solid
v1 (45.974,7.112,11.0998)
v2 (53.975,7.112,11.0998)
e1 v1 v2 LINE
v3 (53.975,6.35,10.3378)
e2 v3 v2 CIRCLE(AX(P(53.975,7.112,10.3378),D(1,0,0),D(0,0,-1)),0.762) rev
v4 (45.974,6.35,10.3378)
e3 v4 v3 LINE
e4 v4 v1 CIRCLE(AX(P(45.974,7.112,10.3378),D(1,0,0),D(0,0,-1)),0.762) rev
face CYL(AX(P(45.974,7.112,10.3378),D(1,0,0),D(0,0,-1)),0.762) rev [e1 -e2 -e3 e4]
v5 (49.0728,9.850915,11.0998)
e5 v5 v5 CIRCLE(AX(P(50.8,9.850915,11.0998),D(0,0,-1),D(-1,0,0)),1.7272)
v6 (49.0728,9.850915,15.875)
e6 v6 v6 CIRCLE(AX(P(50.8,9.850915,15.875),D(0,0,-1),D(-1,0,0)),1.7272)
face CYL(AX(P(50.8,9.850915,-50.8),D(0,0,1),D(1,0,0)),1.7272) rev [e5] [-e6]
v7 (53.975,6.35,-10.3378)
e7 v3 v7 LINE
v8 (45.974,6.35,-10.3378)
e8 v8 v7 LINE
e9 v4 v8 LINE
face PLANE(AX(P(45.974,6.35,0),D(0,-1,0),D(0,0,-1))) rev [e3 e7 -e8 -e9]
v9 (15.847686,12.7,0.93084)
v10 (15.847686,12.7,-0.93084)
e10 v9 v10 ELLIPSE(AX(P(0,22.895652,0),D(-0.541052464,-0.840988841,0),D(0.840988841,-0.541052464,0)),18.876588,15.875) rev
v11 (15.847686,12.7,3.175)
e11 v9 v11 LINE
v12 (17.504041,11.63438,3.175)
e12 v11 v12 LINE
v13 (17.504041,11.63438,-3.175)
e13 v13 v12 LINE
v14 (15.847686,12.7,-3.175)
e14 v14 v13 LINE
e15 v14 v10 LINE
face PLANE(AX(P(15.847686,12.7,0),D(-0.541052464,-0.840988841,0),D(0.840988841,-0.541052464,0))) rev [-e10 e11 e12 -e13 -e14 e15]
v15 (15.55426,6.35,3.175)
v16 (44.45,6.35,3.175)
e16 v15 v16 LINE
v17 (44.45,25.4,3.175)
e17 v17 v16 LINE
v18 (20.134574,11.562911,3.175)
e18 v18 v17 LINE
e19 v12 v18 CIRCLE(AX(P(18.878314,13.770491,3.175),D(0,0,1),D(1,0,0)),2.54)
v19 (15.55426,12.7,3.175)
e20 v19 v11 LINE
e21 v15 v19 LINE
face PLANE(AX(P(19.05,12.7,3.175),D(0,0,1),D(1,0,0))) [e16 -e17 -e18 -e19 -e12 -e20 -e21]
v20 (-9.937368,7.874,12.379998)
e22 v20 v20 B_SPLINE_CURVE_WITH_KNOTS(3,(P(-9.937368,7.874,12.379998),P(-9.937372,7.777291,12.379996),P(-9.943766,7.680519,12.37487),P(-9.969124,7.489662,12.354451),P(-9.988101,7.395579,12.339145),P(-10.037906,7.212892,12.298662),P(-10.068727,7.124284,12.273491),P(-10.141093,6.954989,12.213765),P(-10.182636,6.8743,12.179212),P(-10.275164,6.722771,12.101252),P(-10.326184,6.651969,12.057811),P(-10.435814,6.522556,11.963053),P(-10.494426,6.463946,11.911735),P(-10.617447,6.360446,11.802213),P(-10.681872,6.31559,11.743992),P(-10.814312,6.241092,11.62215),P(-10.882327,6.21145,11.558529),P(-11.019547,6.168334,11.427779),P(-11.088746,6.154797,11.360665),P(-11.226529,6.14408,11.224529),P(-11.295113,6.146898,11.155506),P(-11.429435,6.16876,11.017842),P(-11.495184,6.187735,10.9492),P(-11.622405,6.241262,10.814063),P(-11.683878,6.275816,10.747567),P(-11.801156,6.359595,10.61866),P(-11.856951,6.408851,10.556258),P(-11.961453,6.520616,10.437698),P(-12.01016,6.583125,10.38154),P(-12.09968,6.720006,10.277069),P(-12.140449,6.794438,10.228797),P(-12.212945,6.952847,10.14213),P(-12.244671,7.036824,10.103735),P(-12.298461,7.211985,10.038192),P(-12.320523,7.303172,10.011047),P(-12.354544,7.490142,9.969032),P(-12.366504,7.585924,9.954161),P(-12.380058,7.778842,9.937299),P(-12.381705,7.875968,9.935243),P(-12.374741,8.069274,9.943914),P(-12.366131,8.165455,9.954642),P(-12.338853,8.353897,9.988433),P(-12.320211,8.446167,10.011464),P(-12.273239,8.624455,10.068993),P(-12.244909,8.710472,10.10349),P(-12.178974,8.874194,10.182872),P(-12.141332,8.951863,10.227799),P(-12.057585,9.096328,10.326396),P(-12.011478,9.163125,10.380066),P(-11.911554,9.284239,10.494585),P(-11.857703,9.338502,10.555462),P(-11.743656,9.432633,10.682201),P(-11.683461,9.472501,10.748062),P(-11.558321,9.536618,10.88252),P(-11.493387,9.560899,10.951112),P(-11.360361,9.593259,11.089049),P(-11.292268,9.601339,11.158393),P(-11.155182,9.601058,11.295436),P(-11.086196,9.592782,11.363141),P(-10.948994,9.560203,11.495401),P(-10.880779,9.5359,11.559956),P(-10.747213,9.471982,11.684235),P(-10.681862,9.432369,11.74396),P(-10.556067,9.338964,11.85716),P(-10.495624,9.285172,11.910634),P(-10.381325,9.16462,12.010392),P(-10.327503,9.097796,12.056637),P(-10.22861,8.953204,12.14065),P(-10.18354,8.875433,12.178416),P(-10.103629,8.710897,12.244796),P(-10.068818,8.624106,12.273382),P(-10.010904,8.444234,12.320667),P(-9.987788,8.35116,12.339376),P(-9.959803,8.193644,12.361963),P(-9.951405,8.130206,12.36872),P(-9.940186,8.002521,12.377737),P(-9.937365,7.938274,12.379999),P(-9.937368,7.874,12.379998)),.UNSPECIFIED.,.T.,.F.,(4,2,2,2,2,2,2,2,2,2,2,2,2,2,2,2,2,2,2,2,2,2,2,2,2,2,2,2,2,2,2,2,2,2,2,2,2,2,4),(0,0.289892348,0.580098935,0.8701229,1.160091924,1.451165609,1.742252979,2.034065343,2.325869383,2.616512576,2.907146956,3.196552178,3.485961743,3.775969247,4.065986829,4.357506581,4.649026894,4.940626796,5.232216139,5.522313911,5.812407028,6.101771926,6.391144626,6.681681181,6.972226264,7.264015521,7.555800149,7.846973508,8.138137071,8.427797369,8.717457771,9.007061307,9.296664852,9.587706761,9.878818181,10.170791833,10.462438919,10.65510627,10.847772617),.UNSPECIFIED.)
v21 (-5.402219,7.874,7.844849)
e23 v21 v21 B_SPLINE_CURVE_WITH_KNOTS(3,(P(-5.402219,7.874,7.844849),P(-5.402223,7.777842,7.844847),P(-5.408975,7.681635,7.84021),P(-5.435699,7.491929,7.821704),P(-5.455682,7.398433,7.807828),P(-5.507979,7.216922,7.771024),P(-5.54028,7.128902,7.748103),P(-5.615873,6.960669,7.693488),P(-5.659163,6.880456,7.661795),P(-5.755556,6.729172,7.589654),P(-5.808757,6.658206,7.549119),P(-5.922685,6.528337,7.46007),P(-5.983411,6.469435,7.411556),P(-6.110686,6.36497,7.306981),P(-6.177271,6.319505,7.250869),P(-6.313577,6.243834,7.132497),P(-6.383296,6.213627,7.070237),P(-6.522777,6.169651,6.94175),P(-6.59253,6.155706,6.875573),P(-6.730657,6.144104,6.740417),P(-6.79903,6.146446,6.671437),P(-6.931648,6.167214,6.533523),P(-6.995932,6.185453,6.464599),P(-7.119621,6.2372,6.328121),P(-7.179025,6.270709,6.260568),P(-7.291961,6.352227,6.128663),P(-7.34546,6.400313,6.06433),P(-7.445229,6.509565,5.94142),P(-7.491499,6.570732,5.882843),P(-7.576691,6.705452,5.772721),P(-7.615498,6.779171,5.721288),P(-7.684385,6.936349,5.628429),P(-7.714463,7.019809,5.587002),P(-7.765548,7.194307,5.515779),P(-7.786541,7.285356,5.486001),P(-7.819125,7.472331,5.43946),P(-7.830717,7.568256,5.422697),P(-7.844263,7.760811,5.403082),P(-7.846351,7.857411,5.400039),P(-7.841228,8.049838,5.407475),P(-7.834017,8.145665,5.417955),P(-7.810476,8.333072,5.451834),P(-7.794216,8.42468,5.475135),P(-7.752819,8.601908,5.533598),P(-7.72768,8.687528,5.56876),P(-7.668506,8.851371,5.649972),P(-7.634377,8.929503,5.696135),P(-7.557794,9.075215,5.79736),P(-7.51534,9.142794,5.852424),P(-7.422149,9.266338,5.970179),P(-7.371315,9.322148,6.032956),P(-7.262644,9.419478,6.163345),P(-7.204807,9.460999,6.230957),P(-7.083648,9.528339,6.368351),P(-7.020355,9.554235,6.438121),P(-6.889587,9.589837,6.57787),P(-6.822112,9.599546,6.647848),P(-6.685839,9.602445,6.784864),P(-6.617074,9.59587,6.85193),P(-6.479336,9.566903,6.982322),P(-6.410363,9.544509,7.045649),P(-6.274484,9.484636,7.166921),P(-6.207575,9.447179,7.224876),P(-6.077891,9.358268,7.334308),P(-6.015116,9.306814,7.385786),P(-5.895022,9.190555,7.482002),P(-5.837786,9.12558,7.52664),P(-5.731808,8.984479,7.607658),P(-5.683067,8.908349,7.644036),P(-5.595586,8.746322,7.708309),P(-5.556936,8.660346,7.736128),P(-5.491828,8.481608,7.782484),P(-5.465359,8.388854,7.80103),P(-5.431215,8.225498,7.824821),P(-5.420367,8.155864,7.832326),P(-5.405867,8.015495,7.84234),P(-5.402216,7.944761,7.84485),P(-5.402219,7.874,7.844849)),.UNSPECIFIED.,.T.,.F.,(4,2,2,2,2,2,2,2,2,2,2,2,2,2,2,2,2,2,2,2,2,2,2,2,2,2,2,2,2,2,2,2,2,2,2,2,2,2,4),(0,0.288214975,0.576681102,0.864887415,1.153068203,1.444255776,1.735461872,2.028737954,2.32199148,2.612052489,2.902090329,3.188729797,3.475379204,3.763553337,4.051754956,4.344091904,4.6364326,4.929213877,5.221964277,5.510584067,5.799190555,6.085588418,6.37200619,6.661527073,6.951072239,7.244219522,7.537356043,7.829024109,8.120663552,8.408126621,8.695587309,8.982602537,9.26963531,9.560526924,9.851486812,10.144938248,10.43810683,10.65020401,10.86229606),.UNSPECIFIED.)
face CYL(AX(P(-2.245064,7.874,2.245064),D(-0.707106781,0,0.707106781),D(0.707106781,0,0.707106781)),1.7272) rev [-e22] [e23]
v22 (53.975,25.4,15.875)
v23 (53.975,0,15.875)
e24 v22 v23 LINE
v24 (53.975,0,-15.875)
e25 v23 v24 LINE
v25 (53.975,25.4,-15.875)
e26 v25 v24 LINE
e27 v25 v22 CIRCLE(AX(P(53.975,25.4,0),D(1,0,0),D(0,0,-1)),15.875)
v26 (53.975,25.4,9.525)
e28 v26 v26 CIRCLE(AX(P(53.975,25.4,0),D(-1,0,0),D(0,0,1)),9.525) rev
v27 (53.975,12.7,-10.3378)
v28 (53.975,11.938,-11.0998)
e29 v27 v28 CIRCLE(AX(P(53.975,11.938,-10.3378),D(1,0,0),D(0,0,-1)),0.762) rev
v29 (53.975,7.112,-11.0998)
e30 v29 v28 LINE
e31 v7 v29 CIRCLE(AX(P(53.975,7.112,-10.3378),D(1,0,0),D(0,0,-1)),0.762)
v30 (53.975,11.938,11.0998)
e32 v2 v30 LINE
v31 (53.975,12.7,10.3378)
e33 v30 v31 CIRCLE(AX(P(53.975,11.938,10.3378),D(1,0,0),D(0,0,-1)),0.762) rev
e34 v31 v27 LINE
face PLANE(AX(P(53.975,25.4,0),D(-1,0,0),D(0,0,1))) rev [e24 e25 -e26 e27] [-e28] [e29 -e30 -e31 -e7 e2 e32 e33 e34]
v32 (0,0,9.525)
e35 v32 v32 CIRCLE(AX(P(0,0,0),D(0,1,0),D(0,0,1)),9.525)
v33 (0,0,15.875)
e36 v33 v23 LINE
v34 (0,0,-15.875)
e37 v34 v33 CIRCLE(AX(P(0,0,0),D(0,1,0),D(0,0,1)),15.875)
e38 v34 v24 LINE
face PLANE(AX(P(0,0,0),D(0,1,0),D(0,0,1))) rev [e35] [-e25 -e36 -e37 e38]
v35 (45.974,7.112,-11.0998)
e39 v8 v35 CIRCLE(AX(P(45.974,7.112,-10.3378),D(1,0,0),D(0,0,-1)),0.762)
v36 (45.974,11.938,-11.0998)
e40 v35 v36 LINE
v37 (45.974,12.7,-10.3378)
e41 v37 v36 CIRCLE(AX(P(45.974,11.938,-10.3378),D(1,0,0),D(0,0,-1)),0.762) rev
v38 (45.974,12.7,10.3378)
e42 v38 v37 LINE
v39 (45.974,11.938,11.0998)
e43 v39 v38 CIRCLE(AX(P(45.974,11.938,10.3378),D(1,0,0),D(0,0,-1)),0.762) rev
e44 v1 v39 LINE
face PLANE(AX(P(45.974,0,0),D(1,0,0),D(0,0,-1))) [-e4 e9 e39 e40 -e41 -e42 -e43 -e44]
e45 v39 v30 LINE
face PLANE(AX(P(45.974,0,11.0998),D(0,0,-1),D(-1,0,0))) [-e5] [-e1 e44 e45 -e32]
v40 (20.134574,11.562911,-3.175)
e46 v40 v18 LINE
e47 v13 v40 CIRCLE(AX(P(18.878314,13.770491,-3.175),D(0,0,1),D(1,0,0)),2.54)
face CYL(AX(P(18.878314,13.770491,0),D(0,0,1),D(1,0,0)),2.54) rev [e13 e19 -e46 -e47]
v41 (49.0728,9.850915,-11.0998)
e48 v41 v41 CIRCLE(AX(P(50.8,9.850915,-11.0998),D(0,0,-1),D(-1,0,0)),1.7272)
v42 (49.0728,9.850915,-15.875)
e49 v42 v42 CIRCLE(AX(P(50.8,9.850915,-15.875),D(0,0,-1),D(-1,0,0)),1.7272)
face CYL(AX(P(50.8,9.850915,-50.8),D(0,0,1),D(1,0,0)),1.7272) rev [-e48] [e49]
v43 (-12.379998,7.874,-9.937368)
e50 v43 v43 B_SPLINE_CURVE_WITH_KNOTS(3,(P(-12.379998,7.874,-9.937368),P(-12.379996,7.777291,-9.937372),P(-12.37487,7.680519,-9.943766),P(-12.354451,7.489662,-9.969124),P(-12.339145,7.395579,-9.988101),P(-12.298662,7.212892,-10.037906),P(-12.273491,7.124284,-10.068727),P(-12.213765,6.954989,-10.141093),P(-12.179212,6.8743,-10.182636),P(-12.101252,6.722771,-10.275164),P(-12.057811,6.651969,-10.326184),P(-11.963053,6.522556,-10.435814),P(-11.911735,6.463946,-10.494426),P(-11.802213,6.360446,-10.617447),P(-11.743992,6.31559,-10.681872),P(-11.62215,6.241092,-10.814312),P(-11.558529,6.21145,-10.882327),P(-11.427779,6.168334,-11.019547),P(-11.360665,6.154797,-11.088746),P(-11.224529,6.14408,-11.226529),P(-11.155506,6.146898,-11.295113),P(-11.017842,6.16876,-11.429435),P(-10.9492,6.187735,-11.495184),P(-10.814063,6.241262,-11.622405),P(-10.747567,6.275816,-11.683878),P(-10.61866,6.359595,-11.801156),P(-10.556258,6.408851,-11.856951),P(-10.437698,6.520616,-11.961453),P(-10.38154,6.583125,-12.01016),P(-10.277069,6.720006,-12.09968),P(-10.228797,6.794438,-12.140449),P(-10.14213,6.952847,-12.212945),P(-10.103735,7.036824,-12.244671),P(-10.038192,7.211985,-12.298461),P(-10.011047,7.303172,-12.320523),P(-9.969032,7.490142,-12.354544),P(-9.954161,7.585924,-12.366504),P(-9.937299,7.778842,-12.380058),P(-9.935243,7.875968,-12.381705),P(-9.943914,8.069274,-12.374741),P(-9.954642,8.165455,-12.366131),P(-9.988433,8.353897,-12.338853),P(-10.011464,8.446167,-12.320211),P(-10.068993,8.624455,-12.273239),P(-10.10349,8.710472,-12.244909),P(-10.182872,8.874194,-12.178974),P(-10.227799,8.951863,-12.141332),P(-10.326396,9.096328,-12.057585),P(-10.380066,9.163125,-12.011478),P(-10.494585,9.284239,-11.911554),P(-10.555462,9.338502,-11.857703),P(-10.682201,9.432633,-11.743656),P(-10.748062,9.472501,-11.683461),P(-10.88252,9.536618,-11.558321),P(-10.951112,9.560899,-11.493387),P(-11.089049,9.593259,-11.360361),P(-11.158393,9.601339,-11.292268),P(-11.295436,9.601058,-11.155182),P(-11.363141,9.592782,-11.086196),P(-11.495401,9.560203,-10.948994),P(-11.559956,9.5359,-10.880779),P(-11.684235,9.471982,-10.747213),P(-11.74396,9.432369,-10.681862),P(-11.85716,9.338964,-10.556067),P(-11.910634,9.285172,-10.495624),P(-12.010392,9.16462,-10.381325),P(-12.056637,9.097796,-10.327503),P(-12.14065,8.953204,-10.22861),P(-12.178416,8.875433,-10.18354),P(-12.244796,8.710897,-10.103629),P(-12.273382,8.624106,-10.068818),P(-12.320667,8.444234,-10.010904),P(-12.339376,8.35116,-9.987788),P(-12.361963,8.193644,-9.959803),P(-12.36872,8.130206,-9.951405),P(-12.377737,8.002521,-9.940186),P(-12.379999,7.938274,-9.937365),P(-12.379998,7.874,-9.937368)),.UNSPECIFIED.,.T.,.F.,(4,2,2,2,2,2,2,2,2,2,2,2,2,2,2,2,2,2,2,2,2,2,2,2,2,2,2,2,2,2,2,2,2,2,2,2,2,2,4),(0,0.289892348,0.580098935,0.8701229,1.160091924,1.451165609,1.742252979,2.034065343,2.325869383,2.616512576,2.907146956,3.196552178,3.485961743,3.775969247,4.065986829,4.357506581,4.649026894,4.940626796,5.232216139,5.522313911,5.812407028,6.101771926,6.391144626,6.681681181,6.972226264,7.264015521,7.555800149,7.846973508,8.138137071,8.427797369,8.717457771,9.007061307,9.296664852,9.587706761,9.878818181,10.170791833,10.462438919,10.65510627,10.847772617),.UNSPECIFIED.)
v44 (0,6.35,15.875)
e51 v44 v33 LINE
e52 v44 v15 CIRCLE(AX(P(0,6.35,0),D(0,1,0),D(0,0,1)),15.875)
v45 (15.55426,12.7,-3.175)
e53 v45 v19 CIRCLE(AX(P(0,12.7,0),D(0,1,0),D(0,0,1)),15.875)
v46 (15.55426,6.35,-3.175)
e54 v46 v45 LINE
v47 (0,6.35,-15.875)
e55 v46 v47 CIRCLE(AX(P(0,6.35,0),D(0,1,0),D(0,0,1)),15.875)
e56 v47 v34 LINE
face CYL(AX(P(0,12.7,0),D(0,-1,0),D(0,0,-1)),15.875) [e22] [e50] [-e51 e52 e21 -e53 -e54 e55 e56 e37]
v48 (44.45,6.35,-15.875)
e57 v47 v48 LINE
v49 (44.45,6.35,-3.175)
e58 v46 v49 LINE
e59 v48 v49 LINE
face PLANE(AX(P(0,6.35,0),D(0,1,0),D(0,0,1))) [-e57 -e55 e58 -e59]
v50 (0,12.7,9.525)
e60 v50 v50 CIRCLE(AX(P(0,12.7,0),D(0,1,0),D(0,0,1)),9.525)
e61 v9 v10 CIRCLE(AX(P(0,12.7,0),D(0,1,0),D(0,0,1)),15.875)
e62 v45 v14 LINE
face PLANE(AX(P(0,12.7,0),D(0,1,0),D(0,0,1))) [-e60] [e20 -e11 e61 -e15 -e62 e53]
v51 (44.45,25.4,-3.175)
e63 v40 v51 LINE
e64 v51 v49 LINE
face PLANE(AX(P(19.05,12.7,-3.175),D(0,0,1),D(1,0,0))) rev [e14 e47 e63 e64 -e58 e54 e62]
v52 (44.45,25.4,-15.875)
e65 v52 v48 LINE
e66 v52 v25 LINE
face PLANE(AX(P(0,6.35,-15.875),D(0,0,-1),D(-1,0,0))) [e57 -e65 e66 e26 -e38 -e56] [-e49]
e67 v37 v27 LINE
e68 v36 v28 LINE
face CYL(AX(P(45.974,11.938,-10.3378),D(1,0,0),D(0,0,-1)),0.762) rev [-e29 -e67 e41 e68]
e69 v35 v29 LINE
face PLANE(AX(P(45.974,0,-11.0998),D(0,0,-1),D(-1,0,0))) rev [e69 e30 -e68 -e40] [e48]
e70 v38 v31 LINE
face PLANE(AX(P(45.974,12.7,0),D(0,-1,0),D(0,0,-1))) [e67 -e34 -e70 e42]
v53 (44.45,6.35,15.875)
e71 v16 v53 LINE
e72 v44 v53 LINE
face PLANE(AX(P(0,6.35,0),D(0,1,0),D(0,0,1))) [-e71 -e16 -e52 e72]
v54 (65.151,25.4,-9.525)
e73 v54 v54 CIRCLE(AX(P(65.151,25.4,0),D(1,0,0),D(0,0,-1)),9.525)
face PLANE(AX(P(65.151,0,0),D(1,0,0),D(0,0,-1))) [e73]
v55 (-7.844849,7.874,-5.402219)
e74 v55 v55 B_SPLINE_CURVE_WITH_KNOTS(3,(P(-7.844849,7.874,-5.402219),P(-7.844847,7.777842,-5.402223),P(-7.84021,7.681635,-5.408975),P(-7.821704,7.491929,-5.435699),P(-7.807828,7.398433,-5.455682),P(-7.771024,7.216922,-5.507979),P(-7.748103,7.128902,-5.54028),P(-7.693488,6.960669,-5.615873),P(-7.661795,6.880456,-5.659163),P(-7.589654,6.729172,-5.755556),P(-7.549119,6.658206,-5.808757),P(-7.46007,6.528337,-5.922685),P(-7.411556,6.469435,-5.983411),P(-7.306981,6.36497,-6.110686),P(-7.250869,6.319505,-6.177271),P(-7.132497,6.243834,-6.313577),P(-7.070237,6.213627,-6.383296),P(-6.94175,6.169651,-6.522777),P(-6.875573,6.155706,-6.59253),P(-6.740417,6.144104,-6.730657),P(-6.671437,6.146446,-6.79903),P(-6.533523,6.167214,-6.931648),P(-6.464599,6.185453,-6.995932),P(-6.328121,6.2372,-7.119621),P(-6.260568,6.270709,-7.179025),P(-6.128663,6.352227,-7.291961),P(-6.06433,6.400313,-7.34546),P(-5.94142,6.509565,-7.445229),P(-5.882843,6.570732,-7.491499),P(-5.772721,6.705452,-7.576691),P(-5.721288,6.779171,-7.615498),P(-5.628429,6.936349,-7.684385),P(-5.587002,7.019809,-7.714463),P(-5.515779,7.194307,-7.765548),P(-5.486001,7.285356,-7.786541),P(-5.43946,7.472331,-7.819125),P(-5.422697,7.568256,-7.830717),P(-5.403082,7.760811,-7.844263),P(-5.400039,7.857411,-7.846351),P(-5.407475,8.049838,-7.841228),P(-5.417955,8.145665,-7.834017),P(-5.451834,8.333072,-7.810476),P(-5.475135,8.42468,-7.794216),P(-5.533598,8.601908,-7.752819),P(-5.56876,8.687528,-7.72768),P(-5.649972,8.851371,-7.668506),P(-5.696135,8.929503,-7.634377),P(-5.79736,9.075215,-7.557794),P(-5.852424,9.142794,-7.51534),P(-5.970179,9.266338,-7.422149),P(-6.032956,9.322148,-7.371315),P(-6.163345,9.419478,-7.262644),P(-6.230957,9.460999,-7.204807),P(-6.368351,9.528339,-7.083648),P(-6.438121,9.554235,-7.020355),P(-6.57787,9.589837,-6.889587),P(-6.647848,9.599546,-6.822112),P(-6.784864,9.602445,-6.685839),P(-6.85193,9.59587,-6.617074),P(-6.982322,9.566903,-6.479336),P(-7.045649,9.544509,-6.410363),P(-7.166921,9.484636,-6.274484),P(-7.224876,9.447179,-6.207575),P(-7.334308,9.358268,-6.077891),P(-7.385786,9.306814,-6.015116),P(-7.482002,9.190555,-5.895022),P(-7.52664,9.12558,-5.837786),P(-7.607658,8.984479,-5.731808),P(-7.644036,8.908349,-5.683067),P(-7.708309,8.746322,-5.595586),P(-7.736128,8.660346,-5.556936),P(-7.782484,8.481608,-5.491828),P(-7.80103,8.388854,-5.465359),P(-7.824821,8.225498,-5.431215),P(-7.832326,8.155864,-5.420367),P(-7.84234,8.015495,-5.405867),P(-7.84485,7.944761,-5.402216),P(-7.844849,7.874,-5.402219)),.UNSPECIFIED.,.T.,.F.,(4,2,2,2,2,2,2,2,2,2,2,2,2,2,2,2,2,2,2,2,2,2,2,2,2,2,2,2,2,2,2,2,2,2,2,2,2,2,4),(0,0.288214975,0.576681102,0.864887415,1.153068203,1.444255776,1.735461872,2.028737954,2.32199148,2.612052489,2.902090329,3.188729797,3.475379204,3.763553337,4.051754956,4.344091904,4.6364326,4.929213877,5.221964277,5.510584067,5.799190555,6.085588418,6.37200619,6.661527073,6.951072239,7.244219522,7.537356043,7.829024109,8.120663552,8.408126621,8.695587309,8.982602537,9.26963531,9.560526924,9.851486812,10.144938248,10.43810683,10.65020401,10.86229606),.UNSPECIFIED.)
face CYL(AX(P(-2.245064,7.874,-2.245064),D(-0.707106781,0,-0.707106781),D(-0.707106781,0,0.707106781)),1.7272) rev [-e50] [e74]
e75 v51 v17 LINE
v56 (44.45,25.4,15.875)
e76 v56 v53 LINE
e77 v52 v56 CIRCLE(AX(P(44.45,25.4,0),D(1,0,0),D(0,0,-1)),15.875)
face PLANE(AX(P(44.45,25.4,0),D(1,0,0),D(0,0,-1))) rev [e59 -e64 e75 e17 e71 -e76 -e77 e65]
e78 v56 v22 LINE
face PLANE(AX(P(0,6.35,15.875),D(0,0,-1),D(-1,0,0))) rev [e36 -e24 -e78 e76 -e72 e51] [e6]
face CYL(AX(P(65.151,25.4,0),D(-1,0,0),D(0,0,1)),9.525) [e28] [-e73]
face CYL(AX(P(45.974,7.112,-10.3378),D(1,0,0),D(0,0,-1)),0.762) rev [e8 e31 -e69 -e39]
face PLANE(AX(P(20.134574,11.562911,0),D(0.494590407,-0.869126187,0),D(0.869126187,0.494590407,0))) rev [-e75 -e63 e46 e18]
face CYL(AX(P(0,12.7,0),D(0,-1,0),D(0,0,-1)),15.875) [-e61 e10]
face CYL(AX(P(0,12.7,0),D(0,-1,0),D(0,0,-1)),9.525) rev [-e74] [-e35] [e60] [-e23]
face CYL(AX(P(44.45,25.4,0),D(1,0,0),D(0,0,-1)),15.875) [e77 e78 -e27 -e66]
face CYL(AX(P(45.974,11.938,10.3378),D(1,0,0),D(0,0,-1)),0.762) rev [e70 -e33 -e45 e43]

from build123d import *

# Parameters (mm, degrees)
SKETCH1_R               = 15.875
SKETCH1_R_2             = 9.525
BOSS_EXTRUDE1_DEPTH     = 12.7
SKETCH10_R              = 1.7272
CUT_EXTRUDE3_DEPTH      = 12.7
SKETCH5_R               = 1.7272
CUT_EXTRUDE4_DEPTH      = 12.7
BOSS_EXTRUDE6_DEPTH     = 6.35
SKETCH1_9_W             = 9.525
SKETCH1_9_H             = 31.75
BOSS_EXTRUDE7_DEPTH     = 25.4
RIB18_START             = -3.175
RIB18_DEPTH             = 6.35
CUT_EXTRUDE5_DEPTH      = 8.001
BOSS_EXTRUDE8_DEPTH     = 9.525
BOSS_EXTRUDE9_DEPTH     = 11.176
CUT_EXTRUDE6_DEPTH      = 44.196
CUT_EXTRUDE6_DEPTH_BACK = 50.8
SKETCH22_R              = 1.7272


with BuildPart() as part:
    # Sketch1 → Boss-Extrude1 (new body)
    with BuildSketch(Plane(origin=(0, 0, 0), x_dir=(1, 0, 0), z_dir=(0, 1, 0))):
        with Locations(Location((0, 0, 0), (0, 0, 270))):
            Circle(SKETCH1_R)
        with Locations(Location((0, 0, 0), (0, 0, 270))):
            Circle(SKETCH1_R_2, mode=Mode.SUBTRACT)
    extrude(amount=BOSS_EXTRUDE1_DEPTH)

    # Sketch10 → Cut-Extrude3 (cut)
    with BuildSketch(Plane(origin=(-11.225320151, 0, -11.225320151), x_dir=(-0.7071067811865486, 0, 0.7071067811865465), z_dir=(-0.7071067811865465, 0, -0.7071067811865486))):
        with Locations((0, 7.874)):
            Circle(SKETCH10_R)
    extrude(amount=-CUT_EXTRUDE3_DEPTH, mode=Mode.SUBTRACT)

    # Sketch5 → Cut-Extrude4 (cut)
    with BuildSketch(Plane(origin=(-11.225320151, 0, 11.225320151), x_dir=(0.7071067811865488, 0, 0.7071067811865464), z_dir=(-0.7071067811865464, 0, 0.7071067811865488))):
        with Locations((0, 7.874)):
            Circle(SKETCH5_R)
    extrude(amount=-CUT_EXTRUDE4_DEPTH, mode=Mode.SUBTRACT)

    # Sketch1<8> → Boss-Extrude6 (add)
    with BuildSketch(Plane(origin=(0, 0, 0), x_dir=(1, 0, 0), z_dir=(0, 1, 0))):
        with BuildLine():
            Line((0, -15.875), (15.875, -15.875))
            Line((15.875, -15.875), (15.875, 0))
            ThreePointArc((15.875, 0), (11.225320151, -11.225320151), (0, -15.875))
        make_face()
        with BuildLine():
            Line((15.875, 0), (15.875, 15.875))
            Line((15.875, 15.875), (0, 15.875))
            ThreePointArc((0, 15.875), (11.225320151, 11.225320151), (15.875, 0))
        make_face()
        Polygon((44.45, -15.875), (44.45, 15.875), (15.875, 15.875), (15.875, 0), (15.875, -15.875), align=None)
    extrude(amount=BOSS_EXTRUDE6_DEPTH)

    # Sketch1<9> → Boss-Extrude7 (add)
    with BuildSketch(Plane(origin=(0, 0, 0), x_dir=(1, 0, 0), z_dir=(0, 1, 0))):
        with Locations((49.2125, 0)):
            Rectangle(SKETCH1_9_W, SKETCH1_9_H)
    extrude(amount=BOSS_EXTRUDE7_DEPTH)

    # Rib18: read off the stored shape, not the designer's step
    # Rib18 outline → Rib18 (add)
    with BuildSketch(Plane.XY.offset(RIB18_START)):
        with BuildLine():
            Line((15.847686346, 12.7), (15.554259867, 12.7))
            Line((15.554259867, 12.7), (15.554259867, 6.35))
            Line((15.554259867, 6.35), (44.45, 6.35))
            Line((44.45, 6.35), (44.45, 25.4))
            Line((44.45, 25.4), (20.13457386, 11.562910878))
            ThreePointArc((20.13457386, 11.562910878), (18.809330508, 11.231428329), (17.504040967, 11.634379737))
            Line((17.504040967, 11.634379737), (15.847686346, 12.7))
        make_face()
    extrude(amount=RIB18_DEPTH)

    # Sketch20 → Cut-Extrude5 (cut)
    with BuildSketch(Plane(origin=(53.975, 0, 0), x_dir=(0, 0, -1), z_dir=(1, 0, 0))):
        with BuildLine():
            ThreePointArc((-10.3378, 6.35), (-10.876615367, 6.573184633), (-11.0998, 7.112))
            Line((-11.0998, 7.112), (-11.0998, 11.938))
            ThreePointArc((-11.0998, 11.938), (-10.876615367, 12.476815367), (-10.3378, 12.7))
            Line((-10.3378, 12.7), (10.3378, 12.7))
            ThreePointArc((10.3378, 12.7), (10.876615367, 12.476815367), (11.0998, 11.938))
            Line((11.0998, 11.938), (11.0998, 7.112))
            ThreePointArc((11.0998, 7.112), (10.876615367, 6.573184633), (10.3378, 6.35))
            Line((10.3378, 6.35), (-10.3378, 6.35))
        make_face()
    extrude(amount=-CUT_EXTRUDE5_DEPTH, mode=Mode.SUBTRACT)

    # Sketch20<3> → Boss-Extrude8 (add)
    with BuildSketch(Plane(origin=(53.975, 0, 0), x_dir=(0, 0, -1), z_dir=(1, 0, 0))):
        with BuildLine():
            Line((-15.875, 25.4), (-9.525, 25.4))
            ThreePointArc((-9.525, 25.4), (0, 34.925), (9.525, 25.4))
            Line((9.525, 25.4), (15.875, 25.4))
            ThreePointArc((15.875, 25.4), (0, 41.275), (-15.875, 25.4))
        make_face()
        with BuildLine():
            ThreePointArc((9.525, 25.4), (0, 34.925), (-9.525, 25.4))
            Line((-9.525, 25.4), (9.525, 25.4))
        make_face()
        with BuildLine():
            Line((9.525, 25.4), (-9.525, 25.4))
            ThreePointArc((-9.525, 25.4), (0, 15.875), (9.525, 25.4))
        make_face()
    extrude(amount=-BOSS_EXTRUDE8_DEPTH)

    # Sketch20<4> → Boss-Extrude9 (add)
    with BuildSketch(Plane(origin=(53.975, 0, 0), x_dir=(0, 0, -1), z_dir=(1, 0, 0))):
        with BuildLine():
            ThreePointArc((9.525, 25.4), (0, 34.925), (-9.525, 25.4))
            Line((-9.525, 25.4), (9.525, 25.4))
        make_face()
        with BuildLine():
            Line((9.525, 25.4), (-9.525, 25.4))
            ThreePointArc((-9.525, 25.4), (0, 15.875), (9.525, 25.4))
        make_face()
    extrude(amount=BOSS_EXTRUDE9_DEPTH)

    # Sketch22 → Cut-Extrude6 (cut, two sides: drawn at the far end of the back side and taken through both)
    with BuildSketch(Plane.XY.offset(-CUT_EXTRUDE6_DEPTH_BACK)):
        with Locations(Location((50.8, 9.850914973, 0), (0, 0, 180))):
            Circle(SKETCH22_R)
    extrude(amount=CUT_EXTRUDE6_DEPTH + CUT_EXTRUDE6_DEPTH_BACK, mode=Mode.SUBTRACT)


solid = part.part
